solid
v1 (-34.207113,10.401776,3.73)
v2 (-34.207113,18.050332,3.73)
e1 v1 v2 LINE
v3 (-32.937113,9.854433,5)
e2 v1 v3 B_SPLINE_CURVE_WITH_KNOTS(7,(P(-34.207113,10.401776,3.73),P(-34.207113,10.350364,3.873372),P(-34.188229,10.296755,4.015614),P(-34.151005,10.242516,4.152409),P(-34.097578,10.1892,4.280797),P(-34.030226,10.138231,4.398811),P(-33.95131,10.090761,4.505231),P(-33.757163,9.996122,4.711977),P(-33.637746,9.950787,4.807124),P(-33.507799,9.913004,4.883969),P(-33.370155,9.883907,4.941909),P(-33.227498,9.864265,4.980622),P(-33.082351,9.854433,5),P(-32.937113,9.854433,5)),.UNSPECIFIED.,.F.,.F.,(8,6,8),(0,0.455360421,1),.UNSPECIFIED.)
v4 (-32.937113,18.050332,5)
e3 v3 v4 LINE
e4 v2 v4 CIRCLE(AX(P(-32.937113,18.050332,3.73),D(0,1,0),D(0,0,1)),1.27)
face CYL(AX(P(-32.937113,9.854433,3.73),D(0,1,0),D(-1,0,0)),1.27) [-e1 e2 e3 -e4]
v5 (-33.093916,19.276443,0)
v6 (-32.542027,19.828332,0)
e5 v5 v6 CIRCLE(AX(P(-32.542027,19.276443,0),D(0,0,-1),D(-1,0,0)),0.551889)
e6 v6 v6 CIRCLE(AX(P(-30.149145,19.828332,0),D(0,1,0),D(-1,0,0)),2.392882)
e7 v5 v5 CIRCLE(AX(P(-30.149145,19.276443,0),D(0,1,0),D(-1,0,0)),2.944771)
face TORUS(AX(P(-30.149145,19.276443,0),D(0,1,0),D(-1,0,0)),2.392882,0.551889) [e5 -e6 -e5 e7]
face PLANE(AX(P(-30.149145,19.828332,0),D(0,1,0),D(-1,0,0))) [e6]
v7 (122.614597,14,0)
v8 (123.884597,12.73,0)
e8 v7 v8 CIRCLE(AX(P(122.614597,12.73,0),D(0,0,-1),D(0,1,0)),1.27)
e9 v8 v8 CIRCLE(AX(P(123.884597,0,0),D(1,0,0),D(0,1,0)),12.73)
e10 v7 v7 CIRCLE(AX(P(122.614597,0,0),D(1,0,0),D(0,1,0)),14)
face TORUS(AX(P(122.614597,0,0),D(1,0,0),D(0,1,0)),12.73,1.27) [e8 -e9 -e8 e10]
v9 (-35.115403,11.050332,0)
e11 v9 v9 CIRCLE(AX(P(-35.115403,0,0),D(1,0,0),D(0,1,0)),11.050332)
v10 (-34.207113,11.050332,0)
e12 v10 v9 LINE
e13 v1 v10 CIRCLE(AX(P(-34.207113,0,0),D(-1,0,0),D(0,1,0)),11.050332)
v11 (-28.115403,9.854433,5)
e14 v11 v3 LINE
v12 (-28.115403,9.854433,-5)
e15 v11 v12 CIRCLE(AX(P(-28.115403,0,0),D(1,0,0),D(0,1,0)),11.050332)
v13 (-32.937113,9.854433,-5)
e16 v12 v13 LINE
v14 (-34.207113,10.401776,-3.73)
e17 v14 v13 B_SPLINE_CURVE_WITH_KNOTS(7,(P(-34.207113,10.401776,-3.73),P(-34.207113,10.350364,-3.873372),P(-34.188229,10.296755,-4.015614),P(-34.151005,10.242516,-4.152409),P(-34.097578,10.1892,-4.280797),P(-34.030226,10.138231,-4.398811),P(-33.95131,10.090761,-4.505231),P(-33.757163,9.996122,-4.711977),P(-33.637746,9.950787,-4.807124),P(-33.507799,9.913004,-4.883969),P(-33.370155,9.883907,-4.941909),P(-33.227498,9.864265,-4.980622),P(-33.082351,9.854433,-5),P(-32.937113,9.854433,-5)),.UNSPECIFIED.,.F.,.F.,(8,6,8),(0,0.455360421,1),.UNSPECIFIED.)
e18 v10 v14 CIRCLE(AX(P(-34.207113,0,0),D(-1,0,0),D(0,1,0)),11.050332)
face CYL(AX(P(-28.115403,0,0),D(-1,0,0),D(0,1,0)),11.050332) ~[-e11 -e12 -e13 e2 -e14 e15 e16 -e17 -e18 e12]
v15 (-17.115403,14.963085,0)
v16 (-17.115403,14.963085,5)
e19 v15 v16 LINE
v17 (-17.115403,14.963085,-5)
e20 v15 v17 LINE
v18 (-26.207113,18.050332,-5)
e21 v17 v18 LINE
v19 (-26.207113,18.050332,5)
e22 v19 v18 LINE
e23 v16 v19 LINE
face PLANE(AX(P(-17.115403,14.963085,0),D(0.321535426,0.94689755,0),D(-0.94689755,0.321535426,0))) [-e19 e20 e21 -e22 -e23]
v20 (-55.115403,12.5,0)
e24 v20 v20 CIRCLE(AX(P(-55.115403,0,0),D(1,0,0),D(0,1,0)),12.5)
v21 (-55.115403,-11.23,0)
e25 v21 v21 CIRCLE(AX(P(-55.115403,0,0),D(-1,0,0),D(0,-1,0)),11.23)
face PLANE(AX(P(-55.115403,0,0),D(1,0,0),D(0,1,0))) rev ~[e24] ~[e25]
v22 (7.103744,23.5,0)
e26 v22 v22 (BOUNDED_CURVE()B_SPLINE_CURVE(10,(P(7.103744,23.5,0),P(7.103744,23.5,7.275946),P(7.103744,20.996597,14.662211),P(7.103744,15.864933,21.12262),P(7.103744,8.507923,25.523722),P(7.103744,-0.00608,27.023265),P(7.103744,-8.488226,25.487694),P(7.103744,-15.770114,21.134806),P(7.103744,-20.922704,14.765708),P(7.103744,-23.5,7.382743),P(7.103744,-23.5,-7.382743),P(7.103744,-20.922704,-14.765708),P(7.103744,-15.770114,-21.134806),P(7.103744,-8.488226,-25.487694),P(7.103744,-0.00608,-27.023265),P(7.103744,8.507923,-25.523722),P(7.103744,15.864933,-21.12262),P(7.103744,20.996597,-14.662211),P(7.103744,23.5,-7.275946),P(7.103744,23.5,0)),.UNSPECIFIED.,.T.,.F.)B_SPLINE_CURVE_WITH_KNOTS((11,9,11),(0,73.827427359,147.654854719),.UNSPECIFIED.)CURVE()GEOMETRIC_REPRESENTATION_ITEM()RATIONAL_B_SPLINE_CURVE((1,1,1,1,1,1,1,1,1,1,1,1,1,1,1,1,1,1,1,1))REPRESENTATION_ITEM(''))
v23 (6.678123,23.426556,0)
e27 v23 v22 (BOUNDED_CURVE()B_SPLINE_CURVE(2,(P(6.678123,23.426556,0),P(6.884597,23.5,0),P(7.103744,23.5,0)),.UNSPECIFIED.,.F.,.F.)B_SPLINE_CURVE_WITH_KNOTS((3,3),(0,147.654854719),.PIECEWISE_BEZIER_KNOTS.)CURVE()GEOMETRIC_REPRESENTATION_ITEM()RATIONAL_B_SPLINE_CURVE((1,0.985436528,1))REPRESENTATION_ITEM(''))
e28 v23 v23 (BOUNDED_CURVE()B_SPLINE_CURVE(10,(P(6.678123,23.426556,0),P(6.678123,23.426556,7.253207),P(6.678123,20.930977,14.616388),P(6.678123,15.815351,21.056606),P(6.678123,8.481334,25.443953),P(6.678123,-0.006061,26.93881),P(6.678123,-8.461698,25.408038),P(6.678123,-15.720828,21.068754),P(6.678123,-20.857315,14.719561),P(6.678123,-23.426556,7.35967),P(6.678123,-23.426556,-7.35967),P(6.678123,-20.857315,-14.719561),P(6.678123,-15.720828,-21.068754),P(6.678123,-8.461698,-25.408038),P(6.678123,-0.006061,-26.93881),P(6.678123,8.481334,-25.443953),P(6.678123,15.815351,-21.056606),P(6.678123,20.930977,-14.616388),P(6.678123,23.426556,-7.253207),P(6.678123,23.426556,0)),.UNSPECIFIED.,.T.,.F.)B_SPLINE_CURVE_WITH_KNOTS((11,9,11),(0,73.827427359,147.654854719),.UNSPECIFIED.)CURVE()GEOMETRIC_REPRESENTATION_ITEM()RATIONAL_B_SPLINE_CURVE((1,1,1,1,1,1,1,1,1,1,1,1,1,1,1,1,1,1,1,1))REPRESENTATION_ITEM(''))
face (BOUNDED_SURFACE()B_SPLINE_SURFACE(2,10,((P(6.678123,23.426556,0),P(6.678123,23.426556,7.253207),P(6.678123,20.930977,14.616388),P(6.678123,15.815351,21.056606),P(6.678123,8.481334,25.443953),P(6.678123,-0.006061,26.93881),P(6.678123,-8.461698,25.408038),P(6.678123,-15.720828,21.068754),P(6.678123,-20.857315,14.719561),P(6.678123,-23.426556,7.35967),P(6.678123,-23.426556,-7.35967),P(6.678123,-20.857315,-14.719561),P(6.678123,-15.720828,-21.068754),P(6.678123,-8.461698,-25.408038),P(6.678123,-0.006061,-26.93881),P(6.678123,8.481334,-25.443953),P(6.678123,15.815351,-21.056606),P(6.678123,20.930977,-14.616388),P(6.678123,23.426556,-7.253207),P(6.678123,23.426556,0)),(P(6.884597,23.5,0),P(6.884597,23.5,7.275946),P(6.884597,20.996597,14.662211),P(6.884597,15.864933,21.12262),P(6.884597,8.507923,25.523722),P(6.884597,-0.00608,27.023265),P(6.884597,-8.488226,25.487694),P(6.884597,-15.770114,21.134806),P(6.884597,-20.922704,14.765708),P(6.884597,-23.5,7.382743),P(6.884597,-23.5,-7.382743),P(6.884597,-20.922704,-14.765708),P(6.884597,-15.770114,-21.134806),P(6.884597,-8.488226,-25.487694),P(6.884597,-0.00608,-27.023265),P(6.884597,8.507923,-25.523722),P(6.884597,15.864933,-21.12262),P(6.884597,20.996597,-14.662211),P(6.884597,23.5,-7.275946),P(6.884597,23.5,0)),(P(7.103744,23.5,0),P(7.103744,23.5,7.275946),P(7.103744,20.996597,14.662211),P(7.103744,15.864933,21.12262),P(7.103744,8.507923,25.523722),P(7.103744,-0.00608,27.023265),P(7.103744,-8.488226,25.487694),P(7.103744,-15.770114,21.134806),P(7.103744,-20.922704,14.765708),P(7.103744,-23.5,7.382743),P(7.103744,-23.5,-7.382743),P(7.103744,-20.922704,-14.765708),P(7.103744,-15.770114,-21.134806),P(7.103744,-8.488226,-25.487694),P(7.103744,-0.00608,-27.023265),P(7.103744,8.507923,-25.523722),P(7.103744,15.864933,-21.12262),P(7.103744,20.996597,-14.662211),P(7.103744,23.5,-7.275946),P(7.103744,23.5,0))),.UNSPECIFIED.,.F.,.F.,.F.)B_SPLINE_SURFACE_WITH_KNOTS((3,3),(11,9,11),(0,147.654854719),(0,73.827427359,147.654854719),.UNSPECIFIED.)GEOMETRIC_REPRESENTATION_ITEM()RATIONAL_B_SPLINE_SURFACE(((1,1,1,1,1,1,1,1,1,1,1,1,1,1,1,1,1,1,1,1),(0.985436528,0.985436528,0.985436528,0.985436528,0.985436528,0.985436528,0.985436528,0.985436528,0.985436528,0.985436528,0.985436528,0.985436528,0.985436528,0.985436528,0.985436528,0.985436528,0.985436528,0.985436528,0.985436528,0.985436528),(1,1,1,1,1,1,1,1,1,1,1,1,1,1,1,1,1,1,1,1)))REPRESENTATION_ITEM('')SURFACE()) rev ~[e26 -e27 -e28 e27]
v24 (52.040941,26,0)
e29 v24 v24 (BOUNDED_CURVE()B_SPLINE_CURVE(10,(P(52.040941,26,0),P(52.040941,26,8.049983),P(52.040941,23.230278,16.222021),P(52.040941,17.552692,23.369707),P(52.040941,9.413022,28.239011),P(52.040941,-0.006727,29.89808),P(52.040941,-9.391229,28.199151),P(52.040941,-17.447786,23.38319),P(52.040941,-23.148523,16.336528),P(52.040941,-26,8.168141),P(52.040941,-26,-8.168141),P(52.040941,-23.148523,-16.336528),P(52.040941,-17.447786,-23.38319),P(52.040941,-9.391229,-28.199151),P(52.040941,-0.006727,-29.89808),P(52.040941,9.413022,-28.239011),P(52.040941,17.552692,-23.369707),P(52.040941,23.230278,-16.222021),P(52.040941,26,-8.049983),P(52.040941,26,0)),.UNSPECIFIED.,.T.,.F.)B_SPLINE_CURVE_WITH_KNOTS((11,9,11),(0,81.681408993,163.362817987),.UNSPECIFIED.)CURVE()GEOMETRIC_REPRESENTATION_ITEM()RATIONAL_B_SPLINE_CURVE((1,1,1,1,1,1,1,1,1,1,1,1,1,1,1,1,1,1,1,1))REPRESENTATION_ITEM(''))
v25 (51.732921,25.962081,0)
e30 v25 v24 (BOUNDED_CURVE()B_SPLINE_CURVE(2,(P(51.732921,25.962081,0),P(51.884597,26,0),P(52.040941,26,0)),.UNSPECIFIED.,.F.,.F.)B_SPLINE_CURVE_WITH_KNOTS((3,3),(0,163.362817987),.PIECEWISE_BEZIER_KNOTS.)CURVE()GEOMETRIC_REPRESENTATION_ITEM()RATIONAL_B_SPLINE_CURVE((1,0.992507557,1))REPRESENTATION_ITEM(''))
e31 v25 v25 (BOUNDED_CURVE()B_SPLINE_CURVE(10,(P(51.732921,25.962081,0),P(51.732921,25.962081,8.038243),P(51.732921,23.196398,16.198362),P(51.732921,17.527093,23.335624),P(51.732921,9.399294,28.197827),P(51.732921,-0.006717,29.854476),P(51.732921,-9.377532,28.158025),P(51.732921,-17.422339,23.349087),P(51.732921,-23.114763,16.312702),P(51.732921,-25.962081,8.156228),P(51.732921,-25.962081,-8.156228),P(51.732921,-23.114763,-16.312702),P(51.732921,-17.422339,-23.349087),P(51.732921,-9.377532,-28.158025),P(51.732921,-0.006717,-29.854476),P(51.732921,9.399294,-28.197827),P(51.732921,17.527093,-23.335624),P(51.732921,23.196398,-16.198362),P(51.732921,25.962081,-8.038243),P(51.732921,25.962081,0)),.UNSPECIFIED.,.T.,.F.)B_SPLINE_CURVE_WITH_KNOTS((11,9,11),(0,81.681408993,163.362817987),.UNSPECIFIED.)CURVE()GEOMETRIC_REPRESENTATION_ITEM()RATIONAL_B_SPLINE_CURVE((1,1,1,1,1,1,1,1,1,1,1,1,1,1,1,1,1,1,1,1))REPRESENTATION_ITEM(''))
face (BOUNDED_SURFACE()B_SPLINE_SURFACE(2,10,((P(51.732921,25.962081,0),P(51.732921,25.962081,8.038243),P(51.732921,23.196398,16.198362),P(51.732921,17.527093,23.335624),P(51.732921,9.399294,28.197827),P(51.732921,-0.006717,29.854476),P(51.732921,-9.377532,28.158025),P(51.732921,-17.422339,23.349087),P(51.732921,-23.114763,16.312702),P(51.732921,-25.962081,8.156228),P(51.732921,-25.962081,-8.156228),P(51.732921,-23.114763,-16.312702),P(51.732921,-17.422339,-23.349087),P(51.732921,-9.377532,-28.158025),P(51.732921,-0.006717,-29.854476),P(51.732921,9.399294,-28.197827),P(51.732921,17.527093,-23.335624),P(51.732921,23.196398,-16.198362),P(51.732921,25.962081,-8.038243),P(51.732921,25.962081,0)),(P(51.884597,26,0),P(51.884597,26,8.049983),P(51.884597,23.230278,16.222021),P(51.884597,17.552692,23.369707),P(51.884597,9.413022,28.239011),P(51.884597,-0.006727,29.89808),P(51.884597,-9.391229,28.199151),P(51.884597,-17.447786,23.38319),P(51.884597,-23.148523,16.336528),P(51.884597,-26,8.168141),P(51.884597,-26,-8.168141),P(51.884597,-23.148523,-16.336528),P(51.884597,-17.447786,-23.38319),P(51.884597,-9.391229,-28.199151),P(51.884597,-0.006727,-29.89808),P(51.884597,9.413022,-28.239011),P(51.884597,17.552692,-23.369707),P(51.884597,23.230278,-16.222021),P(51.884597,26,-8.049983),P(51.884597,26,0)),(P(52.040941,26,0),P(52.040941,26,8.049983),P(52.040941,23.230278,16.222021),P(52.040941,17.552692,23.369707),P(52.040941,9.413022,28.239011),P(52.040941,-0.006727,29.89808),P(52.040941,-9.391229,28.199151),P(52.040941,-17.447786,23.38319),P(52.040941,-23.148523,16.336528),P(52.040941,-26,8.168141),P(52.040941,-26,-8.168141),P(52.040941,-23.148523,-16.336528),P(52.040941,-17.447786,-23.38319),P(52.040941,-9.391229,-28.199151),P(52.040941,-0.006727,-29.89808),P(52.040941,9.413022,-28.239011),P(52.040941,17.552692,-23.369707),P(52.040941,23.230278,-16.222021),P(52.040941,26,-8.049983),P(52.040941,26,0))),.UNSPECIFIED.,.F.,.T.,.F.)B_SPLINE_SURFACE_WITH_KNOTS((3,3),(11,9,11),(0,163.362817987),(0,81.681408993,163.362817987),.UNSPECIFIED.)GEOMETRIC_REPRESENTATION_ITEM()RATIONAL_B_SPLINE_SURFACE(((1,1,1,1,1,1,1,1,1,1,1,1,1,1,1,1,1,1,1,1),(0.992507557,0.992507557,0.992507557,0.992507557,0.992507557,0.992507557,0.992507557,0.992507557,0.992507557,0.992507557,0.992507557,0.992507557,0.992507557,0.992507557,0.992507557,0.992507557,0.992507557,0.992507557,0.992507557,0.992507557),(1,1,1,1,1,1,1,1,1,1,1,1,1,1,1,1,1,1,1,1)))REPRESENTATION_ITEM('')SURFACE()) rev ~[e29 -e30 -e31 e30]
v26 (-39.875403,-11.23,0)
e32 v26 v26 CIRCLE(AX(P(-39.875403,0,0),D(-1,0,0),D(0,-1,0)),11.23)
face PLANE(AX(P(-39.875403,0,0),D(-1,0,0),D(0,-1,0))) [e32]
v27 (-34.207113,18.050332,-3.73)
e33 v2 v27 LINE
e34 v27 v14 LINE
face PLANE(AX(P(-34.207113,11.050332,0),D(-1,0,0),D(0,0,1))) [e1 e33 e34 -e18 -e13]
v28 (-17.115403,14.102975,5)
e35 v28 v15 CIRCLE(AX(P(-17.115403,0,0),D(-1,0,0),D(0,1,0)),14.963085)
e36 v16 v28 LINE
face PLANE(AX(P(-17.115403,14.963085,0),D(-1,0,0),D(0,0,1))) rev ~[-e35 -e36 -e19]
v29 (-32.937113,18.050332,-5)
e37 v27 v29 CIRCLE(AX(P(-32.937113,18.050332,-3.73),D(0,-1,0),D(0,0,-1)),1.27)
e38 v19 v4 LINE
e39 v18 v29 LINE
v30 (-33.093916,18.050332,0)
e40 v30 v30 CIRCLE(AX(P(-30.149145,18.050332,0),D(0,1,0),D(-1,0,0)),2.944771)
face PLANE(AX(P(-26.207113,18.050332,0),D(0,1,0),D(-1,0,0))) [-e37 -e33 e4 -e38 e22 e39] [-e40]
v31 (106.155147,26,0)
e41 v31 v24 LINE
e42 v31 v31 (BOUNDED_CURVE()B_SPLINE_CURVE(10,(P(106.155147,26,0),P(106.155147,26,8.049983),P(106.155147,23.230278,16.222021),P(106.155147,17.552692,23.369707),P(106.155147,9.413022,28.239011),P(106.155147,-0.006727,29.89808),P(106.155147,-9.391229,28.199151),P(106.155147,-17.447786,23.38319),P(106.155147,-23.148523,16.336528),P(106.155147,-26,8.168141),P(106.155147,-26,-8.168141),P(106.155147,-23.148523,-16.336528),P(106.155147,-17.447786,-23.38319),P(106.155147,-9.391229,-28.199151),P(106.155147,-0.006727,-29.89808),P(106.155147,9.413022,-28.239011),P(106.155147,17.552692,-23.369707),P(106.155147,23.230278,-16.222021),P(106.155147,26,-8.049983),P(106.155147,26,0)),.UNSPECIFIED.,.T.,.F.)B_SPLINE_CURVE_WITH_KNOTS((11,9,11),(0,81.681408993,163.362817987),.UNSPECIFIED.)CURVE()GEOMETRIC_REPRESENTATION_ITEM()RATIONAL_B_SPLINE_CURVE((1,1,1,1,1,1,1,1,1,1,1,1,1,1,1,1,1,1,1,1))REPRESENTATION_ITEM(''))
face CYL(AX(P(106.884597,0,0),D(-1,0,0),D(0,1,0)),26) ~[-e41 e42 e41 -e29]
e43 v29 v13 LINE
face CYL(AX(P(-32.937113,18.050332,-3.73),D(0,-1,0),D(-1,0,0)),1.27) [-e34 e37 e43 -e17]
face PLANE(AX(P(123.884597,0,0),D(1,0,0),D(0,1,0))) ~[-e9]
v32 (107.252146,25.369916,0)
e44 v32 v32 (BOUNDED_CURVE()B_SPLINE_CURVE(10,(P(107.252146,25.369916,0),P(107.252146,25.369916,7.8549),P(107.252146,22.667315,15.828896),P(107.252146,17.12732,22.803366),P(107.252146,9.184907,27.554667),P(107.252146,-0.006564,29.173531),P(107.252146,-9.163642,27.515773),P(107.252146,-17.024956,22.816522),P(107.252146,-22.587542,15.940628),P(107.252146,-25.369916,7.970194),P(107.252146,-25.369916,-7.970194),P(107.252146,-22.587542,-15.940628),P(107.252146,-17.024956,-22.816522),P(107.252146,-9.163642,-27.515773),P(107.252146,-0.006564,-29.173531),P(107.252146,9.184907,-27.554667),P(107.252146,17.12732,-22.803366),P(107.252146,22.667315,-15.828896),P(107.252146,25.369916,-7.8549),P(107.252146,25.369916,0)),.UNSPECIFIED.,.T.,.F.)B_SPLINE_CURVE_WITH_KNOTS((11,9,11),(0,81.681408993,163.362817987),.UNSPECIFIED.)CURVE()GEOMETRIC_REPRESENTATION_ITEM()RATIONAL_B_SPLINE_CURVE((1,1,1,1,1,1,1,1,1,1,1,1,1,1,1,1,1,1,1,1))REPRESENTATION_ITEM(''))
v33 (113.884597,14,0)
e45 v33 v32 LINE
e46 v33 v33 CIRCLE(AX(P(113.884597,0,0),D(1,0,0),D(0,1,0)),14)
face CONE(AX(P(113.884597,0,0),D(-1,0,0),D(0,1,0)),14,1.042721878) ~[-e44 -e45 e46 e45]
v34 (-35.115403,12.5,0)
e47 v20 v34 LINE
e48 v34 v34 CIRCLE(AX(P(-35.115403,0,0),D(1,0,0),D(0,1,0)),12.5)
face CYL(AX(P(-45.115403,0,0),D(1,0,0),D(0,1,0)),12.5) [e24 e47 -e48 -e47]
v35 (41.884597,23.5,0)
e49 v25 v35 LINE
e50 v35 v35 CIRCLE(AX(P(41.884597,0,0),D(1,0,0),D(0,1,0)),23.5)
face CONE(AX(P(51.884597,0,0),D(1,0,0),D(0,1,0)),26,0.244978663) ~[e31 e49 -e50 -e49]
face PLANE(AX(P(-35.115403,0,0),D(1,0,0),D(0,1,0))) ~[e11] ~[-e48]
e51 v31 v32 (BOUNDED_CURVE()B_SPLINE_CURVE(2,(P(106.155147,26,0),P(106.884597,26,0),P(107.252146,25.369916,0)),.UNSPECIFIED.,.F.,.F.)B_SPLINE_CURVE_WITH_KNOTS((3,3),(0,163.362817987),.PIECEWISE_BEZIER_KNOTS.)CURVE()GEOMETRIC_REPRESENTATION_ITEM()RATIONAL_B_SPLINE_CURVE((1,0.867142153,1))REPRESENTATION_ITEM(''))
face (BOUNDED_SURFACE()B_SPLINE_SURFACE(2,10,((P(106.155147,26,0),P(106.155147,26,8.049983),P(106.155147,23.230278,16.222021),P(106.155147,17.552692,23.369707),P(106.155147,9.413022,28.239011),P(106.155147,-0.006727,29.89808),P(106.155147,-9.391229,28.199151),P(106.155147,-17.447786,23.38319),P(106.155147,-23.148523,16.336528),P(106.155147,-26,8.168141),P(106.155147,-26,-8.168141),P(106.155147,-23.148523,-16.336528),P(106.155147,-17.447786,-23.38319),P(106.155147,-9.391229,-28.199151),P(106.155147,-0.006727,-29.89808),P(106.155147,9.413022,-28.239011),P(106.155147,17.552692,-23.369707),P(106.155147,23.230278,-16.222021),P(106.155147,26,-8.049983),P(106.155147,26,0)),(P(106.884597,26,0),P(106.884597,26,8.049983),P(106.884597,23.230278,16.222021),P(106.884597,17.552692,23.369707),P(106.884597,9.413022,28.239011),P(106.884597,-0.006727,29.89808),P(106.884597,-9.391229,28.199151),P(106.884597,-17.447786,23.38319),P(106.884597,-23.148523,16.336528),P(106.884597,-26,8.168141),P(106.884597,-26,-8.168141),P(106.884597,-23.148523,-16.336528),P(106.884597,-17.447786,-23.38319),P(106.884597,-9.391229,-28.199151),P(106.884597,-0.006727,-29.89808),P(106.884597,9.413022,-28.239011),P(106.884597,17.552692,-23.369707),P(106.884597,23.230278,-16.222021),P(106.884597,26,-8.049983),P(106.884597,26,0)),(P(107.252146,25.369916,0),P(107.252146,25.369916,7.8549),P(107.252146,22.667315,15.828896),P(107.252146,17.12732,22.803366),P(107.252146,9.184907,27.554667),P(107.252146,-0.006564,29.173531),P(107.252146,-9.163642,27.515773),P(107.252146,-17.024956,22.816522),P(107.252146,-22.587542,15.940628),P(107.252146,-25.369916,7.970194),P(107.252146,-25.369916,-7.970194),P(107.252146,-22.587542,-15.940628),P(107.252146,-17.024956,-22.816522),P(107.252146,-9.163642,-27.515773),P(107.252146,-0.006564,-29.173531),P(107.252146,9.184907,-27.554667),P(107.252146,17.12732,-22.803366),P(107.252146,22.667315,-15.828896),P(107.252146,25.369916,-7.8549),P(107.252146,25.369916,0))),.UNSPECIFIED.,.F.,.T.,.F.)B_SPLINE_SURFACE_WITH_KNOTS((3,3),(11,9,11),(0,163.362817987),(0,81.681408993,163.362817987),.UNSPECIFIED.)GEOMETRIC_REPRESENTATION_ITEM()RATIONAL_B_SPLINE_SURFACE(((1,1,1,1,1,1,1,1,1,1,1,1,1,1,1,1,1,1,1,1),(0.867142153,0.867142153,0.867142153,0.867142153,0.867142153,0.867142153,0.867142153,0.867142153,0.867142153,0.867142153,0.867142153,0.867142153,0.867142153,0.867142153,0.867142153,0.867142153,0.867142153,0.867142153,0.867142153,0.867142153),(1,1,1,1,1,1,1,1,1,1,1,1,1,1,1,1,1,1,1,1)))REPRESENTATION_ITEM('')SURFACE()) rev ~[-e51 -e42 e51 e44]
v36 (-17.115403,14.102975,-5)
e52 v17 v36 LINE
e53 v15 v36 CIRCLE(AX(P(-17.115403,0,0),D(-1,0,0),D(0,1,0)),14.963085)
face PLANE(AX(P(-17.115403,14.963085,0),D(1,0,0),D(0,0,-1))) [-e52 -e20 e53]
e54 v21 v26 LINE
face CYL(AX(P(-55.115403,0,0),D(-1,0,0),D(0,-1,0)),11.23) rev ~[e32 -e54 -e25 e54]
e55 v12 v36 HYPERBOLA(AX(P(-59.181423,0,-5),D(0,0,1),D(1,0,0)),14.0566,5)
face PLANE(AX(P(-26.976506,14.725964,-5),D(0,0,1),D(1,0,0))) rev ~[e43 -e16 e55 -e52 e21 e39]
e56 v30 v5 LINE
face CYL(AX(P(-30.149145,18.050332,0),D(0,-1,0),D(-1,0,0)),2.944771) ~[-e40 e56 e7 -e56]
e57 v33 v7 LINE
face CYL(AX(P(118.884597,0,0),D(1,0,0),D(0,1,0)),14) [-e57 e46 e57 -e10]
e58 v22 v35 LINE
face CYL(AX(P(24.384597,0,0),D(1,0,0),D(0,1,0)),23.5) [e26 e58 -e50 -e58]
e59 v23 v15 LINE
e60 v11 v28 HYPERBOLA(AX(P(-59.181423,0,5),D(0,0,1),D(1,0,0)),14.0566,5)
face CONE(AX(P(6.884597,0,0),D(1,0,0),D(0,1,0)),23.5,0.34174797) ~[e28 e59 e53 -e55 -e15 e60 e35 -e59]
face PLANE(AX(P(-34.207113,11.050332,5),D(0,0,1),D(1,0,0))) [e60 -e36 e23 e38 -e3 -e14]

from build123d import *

# Parameters (mm, degrees)
F0_W     = 20
F0_H     = 11.0503323376
F0_H_2   = 1.4496676624
F0_W_2   = 35
F0_H_3   = 23.5
F0_W_3   = 10
F0_H_4   = 14
F2_DEPTH = 5
F3_DEPTH = 5
F4_DEPTH = 10
F6_R     = 1.27
F7_R     = 11.2300002947
F8_DEPTH = 15.24
F5_R     = 2.9447713958
F9_DEPTH = 1.778
F10_R    = 0.5518892204


with BuildPart() as f1:
    # F0 (on Top) → F1 (revolve)
    with BuildSketch(Plane.XY):
        with Locations((-45.1154029071, 5.5251661688)):
            Rectangle(F0_W, F0_H)
        with Locations((-45.1154029071, 11.7751661688)):
            Rectangle(F0_W, F0_H_2)
        Polygon((-35.1154029071, 11.0503323376), (-35.1154029071, 0), (-28.1154029071, 0), (-28.1154029071, 11.0503323376), (-34.2071130872, 11.0503323376), align=None)
        Polygon((-28.1154029071, 11.0503323376), (-28.1154029071, 0), (-17.1154029071, 0), (6.8845970929, 0), (6.8845970929, 23.5), (-17.1154029071, 14.9630850315), align=None)
        with Locations((24.3845970929, 11.75)):
            Rectangle(F0_W_2, F0_H_3)
        Polygon((41.8845970929, 23.5), (41.8845970929, 0), (51.8845970929, 0), (51.8845970929, 26), align=None)
        Polygon((51.8845970929, 26), (51.8845970929, 0), (106.8845970929, 0), (113.8845970929, 0), (113.8845970929, 14), (106.8845970929, 26), align=None)
        with Locations((118.8845970929, 7)):
            Rectangle(F0_W_3, F0_H_4)
    revolve(axis=Axis((34.3845970929, 0, 0), (1, 0, 0)))



with BuildPart() as f2:
    # F0 (on Top) → F2 (new body)
    with BuildSketch(Plane.XY):
        Polygon((-34.2071130872, 11.0503323376), (-28.1154029071, 11.0503323376), (-17.1154029071, 14.9630850315), (-26.2071130872, 18.0503323376), (-34.2071130872, 18.0503323376), align=None)
    extrude(amount=F2_DEPTH)


with BuildPart() as f1_1:
    add(f1.part)

    add(f2.part)  # F3 merges F2
    # F0 (on Top) → F3 (join)
    with BuildSketch(Plane.XY):
        Polygon((-34.2071130872, 11.0503323376), (-28.1154029071, 11.0503323376), (-17.1154029071, 14.9630850315), (-26.2071130872, 18.0503323376), (-34.2071130872, 18.0503323376), align=None)
    extrude(amount=-F3_DEPTH)

    # F4 (add): faces of the model
    f4_faces = [f1_1.faces().sort_by_distance(p)[0] for p in [
        (-31.1612579972, 11.0503323376, 2.5),
        (-31.1612579972, 11.0503323376, -2.5),
        (-22.6154029071, 13.0067086846, 2.5),
        (-22.6154029071, 13.0067086846, -2.5),
    ]]
    extrude(f4_faces, amount=F4_DEPTH, dir=(0, -1, 0))

    # F6
    f6_edges = [f1_1.edges().sort_by_distance(p)[0] for p in [
        (-34.207113, 13.952383, 5),
        (-34.207113, 13.952383, -5),
        (-34.661258, 11.050332, 0),
        (123.884597, -14, 0),
        (106.884597, -26, 0),
        (51.884597, -26, 0),
        (6.884597, -23.5, 0),
    ]]
    fillet(f6_edges, radius=F6_R)

    # F7 (on face) → F8 (cut)
    with BuildSketch(Plane(origin=(-55.1154029071, 0, 0), x_dir=(0, -1, 0), z_dir=(-1, 0, 0))):
        Circle(F7_R)
    extrude(amount=-F8_DEPTH, mode=Mode.SUBTRACT)

    # F5 (on face) → F9 (join)
    with BuildSketch(Plane(origin=(0, 18.0503323376, 0), x_dir=(-1, 0, 0), z_dir=(0, 1, 0))):
        with Locations((30.1491450518, 0)):
            Circle(F5_R)
    extrude(amount=F9_DEPTH)

    # F10
    f10_edges = [f1_1.edges().sort_by_distance(p)[0] for p in [
        (-27.204374, 19.828332, 0),
    ]]
    fillet(f10_edges, radius=F10_R)


solid = f1_1.part
